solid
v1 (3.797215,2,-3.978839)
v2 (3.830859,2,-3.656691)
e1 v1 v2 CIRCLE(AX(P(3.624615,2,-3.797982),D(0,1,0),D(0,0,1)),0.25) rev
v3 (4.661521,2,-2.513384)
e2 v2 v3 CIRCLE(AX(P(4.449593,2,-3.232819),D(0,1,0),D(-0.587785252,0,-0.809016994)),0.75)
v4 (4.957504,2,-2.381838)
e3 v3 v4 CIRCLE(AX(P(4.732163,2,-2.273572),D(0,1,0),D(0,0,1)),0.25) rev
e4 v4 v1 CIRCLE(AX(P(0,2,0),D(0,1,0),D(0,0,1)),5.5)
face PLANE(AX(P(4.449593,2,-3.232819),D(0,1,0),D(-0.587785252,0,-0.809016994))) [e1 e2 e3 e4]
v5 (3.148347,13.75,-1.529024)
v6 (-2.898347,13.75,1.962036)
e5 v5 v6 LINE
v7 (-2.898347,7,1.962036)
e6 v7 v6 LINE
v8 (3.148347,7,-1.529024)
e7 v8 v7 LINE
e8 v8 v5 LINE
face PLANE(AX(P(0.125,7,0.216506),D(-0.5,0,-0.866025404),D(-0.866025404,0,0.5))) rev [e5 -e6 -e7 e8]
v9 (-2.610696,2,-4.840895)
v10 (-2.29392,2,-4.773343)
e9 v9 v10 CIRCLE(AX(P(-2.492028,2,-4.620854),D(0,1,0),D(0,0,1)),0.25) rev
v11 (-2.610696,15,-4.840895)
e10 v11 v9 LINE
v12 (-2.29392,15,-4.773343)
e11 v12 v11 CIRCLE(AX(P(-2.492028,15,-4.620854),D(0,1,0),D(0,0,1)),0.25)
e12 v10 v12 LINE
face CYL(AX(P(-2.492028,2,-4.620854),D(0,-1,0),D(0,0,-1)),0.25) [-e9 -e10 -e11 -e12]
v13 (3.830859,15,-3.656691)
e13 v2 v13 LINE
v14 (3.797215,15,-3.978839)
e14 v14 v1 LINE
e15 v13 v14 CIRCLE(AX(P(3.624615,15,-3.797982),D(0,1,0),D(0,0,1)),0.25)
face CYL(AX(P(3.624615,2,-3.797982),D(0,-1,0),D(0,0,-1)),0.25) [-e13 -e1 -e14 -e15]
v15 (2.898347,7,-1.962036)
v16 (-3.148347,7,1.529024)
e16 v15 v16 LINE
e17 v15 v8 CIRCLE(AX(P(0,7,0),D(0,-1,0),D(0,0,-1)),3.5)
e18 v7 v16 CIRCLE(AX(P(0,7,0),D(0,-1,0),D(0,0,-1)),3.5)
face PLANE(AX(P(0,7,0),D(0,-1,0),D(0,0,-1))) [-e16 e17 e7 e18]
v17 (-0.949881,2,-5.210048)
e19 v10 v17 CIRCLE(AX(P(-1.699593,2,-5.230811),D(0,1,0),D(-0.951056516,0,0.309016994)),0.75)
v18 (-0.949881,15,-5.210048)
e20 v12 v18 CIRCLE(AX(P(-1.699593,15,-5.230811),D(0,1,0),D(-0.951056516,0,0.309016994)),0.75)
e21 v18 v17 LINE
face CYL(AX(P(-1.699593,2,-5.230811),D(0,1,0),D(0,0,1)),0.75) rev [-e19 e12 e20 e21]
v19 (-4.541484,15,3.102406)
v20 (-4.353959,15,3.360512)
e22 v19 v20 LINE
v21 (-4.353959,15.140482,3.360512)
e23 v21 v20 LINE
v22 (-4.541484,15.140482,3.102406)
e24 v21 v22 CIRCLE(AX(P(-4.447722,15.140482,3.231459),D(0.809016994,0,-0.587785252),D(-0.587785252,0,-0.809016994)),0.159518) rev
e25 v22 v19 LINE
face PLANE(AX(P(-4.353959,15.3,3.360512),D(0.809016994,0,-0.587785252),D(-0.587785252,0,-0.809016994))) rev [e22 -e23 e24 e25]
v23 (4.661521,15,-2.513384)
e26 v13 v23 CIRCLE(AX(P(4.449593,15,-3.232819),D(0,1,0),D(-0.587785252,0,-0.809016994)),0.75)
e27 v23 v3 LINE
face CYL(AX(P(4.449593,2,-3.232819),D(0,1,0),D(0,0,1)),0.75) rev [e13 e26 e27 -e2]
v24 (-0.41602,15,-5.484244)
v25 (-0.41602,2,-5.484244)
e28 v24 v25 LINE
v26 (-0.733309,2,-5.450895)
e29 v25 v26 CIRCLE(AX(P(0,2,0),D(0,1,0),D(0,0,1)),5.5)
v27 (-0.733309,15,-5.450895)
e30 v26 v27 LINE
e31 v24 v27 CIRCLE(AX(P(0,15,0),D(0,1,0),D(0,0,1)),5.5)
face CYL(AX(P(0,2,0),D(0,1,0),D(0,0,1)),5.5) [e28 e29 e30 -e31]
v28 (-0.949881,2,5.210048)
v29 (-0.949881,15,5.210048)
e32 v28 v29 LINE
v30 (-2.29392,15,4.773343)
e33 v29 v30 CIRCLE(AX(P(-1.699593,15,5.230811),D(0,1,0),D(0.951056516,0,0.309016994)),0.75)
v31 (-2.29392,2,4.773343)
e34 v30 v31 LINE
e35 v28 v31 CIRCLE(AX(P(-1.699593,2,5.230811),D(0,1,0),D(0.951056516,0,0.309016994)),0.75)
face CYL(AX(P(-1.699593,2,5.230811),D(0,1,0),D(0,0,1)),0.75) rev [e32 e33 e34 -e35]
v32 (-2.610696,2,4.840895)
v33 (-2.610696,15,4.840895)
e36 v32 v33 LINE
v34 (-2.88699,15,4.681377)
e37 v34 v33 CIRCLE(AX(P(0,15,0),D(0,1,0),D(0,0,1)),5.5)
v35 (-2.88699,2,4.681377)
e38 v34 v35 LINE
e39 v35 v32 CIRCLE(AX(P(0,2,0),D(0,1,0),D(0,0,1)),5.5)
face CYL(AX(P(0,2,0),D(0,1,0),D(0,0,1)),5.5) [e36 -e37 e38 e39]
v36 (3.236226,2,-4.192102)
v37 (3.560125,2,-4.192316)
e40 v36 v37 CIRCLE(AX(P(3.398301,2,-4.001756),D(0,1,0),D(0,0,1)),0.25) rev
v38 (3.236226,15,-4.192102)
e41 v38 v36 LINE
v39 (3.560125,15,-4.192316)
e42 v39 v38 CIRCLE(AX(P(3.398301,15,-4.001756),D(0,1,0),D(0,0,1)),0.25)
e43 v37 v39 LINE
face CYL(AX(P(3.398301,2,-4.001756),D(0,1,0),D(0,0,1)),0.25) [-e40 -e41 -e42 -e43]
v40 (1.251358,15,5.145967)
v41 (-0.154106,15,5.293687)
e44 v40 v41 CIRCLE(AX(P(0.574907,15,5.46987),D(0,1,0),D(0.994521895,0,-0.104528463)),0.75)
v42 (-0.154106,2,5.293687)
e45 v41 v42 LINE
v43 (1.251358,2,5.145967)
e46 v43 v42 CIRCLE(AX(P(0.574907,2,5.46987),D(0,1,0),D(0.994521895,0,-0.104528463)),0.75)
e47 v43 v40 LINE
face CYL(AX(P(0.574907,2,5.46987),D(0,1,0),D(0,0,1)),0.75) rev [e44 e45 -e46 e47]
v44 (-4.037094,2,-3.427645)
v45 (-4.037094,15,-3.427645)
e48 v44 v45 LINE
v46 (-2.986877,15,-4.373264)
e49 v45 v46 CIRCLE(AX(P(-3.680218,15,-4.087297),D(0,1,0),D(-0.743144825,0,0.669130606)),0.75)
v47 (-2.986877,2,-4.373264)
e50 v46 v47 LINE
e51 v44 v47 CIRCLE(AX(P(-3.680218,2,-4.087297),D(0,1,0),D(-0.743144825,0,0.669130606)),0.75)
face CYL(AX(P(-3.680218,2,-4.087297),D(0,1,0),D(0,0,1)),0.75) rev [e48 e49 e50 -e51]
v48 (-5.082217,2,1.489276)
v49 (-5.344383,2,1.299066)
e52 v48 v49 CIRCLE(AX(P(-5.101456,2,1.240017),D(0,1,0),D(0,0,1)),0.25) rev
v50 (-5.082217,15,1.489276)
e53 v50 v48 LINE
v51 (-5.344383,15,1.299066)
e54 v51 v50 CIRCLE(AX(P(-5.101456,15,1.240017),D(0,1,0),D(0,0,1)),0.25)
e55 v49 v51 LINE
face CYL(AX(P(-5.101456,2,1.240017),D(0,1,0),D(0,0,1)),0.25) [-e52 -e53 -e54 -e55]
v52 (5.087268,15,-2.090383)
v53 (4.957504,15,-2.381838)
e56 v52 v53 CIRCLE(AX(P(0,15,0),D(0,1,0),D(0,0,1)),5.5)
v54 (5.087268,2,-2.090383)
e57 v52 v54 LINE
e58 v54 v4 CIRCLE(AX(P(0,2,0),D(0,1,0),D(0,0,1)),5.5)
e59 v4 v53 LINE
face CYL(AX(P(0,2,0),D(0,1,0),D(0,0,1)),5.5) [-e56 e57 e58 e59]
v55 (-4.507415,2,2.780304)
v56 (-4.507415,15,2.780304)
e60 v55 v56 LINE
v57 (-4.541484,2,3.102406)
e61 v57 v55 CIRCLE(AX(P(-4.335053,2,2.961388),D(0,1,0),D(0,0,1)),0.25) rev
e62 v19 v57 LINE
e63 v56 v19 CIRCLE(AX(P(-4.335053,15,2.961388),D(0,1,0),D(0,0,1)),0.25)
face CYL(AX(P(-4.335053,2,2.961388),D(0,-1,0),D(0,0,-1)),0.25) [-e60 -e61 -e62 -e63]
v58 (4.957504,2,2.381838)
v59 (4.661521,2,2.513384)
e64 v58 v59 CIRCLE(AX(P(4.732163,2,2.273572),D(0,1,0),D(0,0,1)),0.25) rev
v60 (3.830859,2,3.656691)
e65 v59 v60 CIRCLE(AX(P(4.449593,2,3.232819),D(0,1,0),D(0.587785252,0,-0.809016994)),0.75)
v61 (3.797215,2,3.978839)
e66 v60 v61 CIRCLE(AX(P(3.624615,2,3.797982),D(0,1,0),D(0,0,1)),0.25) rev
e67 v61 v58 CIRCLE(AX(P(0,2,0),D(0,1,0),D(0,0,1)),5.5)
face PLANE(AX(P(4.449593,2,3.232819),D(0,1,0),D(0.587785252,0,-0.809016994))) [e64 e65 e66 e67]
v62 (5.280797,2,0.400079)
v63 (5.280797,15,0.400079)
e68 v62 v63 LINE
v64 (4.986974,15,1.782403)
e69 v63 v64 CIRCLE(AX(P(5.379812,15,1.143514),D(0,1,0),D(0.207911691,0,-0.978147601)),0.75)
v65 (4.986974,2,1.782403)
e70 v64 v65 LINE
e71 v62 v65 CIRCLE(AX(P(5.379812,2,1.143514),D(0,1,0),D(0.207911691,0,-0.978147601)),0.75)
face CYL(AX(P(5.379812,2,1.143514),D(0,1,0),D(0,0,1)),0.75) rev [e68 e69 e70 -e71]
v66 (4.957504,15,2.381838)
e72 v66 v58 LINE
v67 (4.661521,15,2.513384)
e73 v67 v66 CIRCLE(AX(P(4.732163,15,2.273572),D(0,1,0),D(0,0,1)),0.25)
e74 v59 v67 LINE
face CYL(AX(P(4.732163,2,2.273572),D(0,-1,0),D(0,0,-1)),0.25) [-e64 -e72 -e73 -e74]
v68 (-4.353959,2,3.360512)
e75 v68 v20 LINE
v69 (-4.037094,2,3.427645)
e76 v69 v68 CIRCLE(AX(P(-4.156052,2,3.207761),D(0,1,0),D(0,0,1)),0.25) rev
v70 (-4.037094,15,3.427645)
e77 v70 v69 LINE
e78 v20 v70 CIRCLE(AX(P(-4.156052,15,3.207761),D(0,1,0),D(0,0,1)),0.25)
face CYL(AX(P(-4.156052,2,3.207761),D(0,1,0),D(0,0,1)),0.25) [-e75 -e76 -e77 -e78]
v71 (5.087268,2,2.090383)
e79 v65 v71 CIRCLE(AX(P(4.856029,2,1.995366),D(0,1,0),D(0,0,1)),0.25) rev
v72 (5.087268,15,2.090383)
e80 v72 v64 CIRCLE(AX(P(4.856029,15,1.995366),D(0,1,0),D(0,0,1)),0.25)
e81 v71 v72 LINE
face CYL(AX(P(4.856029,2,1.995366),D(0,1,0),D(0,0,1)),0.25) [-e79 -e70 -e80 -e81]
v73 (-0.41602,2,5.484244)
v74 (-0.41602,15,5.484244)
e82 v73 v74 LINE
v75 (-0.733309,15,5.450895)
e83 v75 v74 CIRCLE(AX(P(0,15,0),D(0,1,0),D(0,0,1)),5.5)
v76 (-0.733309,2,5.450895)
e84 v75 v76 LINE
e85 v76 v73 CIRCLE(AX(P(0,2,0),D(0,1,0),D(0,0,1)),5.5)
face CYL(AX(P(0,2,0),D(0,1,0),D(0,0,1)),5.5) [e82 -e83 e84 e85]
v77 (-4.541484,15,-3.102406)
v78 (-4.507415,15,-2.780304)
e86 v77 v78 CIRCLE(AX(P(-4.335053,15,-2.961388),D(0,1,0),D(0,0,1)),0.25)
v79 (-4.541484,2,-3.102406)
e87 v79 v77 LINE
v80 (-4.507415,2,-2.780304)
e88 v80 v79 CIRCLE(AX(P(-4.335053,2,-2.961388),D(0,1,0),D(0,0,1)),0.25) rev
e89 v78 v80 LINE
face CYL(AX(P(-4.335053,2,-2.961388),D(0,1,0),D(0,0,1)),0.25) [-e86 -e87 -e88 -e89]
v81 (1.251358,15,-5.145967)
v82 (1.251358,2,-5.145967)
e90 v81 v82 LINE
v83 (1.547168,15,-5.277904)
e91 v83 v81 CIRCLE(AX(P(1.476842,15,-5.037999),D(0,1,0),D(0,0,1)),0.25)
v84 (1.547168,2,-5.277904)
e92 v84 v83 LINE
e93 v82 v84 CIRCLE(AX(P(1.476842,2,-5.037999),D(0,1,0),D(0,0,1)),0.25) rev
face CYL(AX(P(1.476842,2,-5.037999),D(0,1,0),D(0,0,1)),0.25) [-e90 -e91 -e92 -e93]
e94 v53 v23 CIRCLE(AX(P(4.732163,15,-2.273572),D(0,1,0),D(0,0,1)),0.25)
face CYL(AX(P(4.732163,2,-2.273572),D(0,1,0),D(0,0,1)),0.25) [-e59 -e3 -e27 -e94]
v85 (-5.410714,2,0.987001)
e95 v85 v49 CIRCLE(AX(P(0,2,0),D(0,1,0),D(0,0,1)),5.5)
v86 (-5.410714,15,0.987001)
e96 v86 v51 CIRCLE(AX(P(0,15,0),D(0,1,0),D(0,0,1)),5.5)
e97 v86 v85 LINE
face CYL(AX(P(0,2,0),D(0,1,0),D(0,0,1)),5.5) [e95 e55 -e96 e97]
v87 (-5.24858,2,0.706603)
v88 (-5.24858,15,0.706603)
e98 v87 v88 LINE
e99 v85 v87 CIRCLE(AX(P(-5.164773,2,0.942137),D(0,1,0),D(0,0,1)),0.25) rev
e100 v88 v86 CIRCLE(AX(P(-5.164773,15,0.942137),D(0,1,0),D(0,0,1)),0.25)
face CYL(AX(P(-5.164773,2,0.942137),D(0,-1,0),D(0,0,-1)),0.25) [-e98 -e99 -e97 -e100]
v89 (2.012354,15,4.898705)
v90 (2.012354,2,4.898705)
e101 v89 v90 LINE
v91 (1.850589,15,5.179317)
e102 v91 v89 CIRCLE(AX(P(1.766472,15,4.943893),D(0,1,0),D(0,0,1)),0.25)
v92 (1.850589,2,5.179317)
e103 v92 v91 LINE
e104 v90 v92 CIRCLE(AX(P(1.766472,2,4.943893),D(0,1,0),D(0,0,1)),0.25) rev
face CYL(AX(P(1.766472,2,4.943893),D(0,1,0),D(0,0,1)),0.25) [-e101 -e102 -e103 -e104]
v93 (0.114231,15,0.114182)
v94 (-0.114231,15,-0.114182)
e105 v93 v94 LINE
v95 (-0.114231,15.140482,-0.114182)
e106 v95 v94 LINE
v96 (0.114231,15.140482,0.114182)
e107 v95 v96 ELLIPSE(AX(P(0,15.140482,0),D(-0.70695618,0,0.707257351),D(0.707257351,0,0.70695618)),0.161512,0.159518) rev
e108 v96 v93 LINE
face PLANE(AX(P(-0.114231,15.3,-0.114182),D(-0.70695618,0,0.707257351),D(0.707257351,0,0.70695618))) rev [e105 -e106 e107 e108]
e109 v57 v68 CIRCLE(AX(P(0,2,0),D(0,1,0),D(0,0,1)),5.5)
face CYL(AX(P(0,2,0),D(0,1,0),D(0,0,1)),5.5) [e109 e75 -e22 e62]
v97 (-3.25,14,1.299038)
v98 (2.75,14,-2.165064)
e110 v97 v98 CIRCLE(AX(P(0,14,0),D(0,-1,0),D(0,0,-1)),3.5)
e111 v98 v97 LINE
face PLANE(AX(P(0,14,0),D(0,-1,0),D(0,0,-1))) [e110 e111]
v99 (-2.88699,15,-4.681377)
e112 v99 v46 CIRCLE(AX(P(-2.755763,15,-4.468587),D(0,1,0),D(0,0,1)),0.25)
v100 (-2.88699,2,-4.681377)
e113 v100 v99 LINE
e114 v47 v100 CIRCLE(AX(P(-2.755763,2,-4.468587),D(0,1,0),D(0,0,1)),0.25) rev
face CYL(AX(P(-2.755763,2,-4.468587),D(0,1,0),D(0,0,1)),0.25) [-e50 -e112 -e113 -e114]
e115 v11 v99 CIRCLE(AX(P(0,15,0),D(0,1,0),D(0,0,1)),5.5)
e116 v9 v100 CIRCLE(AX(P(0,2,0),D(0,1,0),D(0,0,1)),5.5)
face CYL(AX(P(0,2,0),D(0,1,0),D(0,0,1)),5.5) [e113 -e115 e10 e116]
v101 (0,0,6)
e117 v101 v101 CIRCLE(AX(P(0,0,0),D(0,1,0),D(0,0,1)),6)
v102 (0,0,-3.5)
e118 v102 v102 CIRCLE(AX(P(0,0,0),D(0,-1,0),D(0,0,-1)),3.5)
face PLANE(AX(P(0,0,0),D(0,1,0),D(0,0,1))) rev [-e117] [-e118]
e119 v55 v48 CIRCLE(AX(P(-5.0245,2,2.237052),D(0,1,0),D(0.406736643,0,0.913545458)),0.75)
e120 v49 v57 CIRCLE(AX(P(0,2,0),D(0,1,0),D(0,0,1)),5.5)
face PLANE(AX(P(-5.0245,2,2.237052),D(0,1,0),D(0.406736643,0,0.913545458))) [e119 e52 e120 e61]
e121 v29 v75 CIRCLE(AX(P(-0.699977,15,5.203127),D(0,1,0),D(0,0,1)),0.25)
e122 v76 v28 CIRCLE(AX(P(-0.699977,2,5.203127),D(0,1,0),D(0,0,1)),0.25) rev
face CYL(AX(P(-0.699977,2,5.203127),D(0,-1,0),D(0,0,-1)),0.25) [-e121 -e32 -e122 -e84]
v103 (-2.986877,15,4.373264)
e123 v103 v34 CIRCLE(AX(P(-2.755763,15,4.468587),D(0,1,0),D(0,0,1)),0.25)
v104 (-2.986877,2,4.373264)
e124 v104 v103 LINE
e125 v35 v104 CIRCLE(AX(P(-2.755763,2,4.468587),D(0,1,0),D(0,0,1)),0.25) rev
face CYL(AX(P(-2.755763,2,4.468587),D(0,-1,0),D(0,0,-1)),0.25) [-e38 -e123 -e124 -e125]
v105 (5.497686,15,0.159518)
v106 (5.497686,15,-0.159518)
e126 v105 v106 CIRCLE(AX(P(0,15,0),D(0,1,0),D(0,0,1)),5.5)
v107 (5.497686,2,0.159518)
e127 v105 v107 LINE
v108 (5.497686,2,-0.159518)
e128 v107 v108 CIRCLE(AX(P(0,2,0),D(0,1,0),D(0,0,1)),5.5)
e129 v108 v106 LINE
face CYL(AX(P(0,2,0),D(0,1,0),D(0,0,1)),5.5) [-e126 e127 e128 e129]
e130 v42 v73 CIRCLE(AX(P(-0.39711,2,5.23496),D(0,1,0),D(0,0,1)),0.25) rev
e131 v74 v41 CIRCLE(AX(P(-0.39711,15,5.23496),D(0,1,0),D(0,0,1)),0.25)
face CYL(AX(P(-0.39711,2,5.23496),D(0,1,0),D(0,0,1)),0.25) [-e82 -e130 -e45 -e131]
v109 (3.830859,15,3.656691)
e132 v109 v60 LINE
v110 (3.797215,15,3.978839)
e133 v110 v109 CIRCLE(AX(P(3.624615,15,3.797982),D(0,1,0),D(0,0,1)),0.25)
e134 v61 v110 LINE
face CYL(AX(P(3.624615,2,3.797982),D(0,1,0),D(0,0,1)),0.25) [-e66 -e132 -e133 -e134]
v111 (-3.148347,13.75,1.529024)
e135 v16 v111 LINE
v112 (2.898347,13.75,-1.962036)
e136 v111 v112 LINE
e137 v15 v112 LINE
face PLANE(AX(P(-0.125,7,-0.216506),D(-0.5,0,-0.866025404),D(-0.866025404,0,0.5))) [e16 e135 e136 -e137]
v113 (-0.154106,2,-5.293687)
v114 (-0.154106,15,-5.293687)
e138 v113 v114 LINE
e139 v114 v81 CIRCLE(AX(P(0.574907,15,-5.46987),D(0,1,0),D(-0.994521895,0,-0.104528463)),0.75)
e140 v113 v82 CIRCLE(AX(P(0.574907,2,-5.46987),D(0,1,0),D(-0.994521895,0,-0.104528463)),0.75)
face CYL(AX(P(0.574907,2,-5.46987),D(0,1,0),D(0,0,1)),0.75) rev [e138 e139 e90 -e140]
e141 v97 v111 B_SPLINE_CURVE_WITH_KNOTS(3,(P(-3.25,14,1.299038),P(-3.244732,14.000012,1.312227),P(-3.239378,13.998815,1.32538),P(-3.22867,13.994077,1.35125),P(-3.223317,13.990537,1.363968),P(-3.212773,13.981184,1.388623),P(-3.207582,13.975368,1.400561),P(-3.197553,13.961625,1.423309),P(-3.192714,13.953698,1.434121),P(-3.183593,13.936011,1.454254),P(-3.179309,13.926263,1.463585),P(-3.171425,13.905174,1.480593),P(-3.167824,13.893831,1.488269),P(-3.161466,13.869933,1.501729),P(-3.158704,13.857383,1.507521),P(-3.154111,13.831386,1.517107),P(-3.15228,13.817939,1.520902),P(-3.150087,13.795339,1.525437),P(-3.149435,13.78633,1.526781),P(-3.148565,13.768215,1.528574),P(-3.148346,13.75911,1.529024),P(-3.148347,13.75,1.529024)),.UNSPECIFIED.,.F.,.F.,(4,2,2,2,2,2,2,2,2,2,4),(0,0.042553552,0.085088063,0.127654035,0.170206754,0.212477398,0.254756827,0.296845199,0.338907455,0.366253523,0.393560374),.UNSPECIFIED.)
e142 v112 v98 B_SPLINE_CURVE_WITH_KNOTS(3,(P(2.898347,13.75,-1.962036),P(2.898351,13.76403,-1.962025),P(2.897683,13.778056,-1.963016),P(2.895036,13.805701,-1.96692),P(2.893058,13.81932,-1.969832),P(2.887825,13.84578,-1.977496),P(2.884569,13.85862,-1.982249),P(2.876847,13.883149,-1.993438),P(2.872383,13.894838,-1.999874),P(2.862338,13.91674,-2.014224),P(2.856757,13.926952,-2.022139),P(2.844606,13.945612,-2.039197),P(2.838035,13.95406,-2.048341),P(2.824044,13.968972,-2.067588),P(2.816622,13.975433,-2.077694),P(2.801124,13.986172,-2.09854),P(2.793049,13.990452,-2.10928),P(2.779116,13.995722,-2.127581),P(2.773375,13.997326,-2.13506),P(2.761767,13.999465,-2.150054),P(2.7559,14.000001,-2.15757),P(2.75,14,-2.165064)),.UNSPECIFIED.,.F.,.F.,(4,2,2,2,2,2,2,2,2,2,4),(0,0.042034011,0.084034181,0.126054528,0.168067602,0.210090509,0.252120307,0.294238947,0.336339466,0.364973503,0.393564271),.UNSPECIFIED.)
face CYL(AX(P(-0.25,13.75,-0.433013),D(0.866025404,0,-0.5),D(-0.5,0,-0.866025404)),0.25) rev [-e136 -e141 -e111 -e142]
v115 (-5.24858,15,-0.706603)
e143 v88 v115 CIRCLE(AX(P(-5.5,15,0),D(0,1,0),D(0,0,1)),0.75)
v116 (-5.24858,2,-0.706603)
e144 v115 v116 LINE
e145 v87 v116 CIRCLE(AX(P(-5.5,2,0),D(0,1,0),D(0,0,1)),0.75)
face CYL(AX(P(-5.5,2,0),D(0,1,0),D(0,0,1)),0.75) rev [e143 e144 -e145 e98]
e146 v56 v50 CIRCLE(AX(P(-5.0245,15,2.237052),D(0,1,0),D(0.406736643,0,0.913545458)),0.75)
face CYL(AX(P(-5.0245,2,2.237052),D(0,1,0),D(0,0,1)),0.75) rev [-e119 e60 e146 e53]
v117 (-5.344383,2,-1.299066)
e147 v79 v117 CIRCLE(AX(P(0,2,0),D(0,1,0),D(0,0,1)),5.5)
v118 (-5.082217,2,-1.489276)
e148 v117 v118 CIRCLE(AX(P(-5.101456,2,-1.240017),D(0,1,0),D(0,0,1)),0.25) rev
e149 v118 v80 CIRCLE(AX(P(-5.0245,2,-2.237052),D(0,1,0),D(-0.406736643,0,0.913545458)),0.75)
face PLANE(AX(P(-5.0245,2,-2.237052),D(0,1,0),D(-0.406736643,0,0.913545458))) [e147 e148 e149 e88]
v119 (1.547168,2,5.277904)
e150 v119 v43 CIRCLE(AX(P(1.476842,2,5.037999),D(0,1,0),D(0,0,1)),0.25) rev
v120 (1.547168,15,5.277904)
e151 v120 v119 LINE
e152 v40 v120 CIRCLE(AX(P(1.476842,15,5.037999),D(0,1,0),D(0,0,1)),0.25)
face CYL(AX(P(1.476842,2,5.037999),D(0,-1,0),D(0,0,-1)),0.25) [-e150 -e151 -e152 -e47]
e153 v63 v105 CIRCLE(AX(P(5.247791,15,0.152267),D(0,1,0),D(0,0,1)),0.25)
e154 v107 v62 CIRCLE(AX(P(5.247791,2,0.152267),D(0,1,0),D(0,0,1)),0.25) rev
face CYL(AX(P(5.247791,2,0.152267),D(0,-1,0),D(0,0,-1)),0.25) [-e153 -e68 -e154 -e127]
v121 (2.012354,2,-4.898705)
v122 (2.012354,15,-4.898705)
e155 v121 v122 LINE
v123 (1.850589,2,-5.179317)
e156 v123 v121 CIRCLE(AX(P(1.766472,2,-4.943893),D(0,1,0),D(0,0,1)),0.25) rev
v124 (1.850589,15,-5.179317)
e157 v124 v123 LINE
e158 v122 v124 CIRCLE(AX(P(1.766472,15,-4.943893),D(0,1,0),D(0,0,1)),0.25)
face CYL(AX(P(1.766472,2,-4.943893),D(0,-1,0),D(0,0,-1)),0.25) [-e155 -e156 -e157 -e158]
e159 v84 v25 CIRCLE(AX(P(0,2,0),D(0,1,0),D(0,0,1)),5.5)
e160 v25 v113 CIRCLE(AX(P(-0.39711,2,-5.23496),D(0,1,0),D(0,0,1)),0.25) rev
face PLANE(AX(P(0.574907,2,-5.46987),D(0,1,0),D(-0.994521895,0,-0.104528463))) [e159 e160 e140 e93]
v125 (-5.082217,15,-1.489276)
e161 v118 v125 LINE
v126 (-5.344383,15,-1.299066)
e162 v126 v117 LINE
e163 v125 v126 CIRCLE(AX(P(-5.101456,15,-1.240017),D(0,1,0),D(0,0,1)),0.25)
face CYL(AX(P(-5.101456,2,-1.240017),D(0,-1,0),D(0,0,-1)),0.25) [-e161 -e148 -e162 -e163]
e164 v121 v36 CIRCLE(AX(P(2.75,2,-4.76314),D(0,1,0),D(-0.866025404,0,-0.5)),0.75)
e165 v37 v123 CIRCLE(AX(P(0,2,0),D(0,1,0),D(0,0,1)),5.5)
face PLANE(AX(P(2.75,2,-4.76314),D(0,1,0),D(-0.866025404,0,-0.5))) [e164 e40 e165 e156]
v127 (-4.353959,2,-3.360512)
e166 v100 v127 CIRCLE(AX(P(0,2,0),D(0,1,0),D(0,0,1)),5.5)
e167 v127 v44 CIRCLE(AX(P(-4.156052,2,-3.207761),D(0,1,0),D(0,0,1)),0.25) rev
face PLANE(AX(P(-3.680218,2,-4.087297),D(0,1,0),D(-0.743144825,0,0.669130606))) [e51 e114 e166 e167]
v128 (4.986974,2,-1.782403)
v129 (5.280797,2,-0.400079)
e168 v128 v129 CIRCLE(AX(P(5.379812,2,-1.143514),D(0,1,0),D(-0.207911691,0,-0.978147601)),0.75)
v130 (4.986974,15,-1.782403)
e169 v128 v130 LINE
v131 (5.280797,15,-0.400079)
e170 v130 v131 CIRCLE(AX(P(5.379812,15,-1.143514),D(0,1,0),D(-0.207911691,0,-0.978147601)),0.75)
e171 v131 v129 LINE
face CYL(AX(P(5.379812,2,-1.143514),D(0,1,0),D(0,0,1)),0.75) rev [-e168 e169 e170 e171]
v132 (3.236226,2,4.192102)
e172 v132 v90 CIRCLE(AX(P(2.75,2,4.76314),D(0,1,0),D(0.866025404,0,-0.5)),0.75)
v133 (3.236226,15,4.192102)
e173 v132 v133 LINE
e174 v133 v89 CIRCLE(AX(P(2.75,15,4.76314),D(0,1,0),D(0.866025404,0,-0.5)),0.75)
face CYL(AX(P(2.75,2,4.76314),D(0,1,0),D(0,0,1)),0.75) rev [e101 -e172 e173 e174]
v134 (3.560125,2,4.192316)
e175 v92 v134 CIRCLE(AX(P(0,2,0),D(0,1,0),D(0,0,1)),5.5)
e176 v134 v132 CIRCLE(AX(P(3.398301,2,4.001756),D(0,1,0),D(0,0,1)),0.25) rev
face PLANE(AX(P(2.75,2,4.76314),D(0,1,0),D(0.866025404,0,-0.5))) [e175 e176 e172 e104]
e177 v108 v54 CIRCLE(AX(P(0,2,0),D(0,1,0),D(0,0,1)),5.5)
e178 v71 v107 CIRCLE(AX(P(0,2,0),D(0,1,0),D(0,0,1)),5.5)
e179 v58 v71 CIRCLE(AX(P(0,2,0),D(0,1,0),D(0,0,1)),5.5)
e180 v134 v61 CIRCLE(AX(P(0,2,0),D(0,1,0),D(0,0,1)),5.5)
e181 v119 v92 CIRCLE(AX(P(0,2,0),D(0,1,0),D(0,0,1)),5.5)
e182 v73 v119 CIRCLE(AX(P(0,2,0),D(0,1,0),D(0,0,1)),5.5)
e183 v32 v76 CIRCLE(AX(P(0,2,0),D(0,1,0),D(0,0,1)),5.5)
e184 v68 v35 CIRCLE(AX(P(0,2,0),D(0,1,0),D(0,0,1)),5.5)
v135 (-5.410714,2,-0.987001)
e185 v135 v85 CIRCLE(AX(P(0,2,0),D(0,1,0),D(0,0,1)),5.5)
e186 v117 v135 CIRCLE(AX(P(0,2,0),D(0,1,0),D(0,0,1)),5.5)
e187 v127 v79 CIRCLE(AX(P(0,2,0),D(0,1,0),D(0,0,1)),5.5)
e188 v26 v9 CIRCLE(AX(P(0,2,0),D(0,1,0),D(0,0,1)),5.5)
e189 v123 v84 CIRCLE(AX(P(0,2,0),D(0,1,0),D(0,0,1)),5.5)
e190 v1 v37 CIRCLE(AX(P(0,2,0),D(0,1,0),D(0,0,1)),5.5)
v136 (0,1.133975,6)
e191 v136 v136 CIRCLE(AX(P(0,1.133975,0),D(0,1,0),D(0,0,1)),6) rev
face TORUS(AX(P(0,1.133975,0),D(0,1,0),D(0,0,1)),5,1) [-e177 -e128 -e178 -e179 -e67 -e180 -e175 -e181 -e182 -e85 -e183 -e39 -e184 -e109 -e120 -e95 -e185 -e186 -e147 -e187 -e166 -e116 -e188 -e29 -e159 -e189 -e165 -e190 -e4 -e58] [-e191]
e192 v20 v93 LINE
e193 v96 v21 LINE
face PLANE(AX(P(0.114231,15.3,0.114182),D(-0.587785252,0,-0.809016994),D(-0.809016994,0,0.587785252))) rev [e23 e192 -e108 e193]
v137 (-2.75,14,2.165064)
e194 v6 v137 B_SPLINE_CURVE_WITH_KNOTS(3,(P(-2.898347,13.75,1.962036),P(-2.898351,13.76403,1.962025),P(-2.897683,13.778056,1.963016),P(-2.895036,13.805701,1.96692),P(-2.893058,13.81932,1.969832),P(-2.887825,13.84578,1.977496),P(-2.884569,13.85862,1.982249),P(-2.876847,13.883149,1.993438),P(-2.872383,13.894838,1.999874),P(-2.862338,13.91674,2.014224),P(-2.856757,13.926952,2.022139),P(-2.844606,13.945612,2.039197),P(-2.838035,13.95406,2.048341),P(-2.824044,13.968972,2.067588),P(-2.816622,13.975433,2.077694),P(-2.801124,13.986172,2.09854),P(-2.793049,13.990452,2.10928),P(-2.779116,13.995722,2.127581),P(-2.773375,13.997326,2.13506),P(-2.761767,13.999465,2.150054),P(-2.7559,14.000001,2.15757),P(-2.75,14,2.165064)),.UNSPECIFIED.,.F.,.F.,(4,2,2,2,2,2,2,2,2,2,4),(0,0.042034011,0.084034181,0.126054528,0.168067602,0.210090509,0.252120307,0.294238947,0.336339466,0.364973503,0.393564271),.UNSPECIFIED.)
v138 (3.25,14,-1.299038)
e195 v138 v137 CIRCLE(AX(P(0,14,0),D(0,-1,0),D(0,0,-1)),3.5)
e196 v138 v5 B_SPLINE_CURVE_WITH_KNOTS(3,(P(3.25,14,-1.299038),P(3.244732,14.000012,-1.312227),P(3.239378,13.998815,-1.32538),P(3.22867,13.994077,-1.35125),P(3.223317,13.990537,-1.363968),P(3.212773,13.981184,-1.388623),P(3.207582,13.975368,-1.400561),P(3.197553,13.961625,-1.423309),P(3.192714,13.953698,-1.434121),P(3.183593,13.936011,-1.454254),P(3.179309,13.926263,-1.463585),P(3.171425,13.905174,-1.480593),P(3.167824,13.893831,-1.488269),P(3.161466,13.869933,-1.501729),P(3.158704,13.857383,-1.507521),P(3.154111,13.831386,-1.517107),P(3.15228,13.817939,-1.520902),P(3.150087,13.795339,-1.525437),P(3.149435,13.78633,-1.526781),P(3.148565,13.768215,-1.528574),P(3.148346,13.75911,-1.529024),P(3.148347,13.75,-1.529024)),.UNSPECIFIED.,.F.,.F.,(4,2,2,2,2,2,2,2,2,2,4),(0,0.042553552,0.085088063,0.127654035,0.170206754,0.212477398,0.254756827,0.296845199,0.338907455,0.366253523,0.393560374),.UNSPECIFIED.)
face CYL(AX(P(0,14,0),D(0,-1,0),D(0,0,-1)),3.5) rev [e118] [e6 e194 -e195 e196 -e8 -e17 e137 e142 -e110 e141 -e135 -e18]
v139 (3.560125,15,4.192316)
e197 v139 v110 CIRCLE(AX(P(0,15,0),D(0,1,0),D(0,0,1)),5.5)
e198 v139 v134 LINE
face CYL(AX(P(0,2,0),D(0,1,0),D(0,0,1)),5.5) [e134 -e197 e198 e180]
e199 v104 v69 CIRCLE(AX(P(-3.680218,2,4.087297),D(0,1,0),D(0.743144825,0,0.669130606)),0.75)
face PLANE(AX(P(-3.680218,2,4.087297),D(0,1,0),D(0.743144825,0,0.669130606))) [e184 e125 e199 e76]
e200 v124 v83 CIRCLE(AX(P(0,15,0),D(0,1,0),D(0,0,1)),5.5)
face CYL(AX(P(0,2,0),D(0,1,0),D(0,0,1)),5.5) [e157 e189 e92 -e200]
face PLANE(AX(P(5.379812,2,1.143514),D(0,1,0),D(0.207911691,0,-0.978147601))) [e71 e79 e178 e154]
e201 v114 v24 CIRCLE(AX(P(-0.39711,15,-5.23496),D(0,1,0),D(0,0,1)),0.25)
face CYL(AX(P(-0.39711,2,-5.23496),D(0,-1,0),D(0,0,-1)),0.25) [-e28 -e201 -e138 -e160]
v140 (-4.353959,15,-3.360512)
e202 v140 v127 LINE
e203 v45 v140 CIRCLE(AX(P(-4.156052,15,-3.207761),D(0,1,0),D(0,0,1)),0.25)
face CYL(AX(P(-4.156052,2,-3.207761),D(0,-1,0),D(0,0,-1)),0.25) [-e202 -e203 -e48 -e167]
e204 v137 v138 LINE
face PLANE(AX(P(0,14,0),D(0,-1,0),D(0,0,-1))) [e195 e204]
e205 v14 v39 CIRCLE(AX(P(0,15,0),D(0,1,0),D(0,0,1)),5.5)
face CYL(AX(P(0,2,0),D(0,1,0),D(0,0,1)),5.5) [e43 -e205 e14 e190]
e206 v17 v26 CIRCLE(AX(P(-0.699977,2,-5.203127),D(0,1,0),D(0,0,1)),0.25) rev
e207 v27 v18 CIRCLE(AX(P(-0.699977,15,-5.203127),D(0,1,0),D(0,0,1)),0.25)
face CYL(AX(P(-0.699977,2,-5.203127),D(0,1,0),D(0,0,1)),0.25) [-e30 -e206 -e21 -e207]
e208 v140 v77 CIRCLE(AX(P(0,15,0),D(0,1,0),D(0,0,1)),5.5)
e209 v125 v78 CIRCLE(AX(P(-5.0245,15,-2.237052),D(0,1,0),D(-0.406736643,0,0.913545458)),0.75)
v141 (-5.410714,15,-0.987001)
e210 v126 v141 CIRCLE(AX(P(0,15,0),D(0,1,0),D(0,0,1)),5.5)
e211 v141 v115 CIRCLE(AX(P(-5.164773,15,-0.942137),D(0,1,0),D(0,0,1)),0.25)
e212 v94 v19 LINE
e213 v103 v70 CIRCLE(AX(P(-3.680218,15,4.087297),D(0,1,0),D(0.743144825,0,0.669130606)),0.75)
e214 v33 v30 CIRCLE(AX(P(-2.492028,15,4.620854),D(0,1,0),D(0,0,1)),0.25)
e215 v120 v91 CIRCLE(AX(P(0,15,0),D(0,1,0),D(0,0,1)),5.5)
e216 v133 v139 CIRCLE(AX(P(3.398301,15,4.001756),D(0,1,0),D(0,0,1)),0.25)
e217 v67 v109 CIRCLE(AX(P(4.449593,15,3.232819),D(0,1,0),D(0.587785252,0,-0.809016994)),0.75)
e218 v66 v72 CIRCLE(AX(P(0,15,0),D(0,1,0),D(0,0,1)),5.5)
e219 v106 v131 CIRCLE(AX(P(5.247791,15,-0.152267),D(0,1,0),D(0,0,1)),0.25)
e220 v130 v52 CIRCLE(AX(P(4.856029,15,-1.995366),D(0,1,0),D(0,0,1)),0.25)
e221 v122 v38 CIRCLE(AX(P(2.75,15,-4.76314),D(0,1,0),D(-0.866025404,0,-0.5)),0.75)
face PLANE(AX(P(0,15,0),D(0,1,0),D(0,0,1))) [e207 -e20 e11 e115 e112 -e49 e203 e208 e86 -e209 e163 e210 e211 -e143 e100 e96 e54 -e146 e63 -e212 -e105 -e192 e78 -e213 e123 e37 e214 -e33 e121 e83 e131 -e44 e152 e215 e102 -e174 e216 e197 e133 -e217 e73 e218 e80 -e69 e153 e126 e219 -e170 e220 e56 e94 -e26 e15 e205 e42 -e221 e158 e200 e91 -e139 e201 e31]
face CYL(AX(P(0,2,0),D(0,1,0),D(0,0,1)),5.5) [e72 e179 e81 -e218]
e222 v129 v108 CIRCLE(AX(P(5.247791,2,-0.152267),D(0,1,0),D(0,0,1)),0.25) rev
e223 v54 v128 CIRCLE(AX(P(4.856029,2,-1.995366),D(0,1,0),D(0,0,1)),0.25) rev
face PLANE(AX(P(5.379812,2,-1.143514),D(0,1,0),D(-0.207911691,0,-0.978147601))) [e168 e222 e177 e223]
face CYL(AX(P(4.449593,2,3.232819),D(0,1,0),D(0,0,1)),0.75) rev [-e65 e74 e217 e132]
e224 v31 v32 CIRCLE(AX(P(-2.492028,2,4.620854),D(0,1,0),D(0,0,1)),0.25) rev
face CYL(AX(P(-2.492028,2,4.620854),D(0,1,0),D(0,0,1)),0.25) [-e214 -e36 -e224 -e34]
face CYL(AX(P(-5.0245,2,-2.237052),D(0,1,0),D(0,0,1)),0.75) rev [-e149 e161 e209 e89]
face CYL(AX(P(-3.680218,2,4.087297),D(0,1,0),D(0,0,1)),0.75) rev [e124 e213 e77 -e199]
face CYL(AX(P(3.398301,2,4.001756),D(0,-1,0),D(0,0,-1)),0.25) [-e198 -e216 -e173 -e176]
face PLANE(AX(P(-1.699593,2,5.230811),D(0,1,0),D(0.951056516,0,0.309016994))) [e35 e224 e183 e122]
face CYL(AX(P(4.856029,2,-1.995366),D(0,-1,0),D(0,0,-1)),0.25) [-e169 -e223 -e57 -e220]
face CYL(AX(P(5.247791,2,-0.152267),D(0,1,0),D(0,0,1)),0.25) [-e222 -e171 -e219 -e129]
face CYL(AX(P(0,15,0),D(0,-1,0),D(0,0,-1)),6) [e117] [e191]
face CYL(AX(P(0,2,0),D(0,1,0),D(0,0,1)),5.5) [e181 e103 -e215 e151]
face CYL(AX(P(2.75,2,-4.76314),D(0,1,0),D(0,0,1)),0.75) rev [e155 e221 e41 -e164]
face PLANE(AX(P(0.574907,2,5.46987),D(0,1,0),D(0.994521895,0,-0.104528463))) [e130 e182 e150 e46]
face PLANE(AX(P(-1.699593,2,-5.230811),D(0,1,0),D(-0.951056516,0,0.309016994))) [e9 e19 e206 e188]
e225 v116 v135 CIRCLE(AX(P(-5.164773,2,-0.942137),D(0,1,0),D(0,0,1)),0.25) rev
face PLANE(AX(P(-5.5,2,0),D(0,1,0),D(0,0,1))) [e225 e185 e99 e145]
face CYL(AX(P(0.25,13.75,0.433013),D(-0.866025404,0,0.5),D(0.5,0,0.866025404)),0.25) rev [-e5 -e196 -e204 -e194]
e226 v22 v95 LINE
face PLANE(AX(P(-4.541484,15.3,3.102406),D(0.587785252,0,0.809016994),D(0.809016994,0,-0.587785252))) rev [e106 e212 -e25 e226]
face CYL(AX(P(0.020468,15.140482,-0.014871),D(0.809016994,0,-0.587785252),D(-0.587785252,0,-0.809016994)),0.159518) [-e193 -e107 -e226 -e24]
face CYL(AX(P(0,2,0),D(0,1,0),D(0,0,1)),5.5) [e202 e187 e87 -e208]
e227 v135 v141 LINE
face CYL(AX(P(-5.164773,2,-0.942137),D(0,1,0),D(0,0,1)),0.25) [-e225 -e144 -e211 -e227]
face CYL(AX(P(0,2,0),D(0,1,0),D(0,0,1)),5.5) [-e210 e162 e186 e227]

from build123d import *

# Parameters (mm, degrees)
SKETCH1_R                = 6
BOSS_EXTRUDE1_DEPTH      = 15
CUT_EXTRUDE1_START       = -13
SKETCH2_R                = 6
SKETCH2_R_2              = 5.5
CUT_EXTRUDE1_DEPTH       = 13
FILLET1_R                = 1
SKETCH3_R                = 0.75
CUT_EXTRUDE2_DEPTH       = 13
FILLET2_R                = 0.25
CIRPATTERN1_COUNT        = 15
FILLET2_OF_CIRPATTERN1_R = 0.25
SKETCH4_R                = 3.5
CUT_EXTRUDE3_DEPTH       = 14
BOSS_EXTRUDE2_DEPTH      = 7
FILLET3_R                = 0.25
BOSS_EXTRUDE3_DEPTH      = 0.3
FILLET4_R                = 0.159518


# Some blends are built 0.0001 mm under size
with BuildPart() as part:
    # Sketch1 → Boss-Extrude1 (new body)
    with BuildSketch(Plane(origin=(0, 0, 0), x_dir=(1, 0, 0), z_dir=(0, 1, 0))):
        with Locations(Location((0, 0, 0), (0, 0, 270))):
            Circle(SKETCH1_R)
    extrude(amount=BOSS_EXTRUDE1_DEPTH)

    # Sketch2 → Cut-Extrude1 (cut)
    with BuildSketch(Plane(origin=(0, 15, 0), x_dir=(1, 0, 0), z_dir=(0, 1, 0)).offset(CUT_EXTRUDE1_START)):
        with Locations(Location((0, 0, 0), (0, 0, 270))):
            Circle(SKETCH2_R)
        with Locations(Location((0, 0, 0), (0, 0, 270))):
            Circle(SKETCH2_R_2, mode=Mode.SUBTRACT)
    extrude(amount=CUT_EXTRUDE1_DEPTH, mode=Mode.SUBTRACT)

    # Fillet1
    # the kernel refuses this fillet: 1 mm, written as the material it takes off along each edge
    with BuildSketch(Plane(origin=(0, 2, 0), x_dir=(0, 0, 1), z_dir=(-1, 0, 0))) as fillet1_piece_1:
        with BuildLine():
            CenterArc((5, -0.866025404), FILLET1_R, 0, 60)
            Line((5.5, 0), (5.51, 0.017320508))
            ThreePointArc((5.51, 0.017320508), (5.75, 0.02), (6, 0.02))
            Line((6, 0.02), (6.02, 0))
            Line((6.02, 0), (6.02, -0.866025404))
            Line((6.02, -0.866025404), (6, -0.866025404))
        make_face()
    revolve(axis=Axis((0, 2, 0), (0, 1, 0)), mode=Mode.SUBTRACT)

    # Sketch3 → Cut-Extrude2 (cut)
    with BuildSketch(Plane(origin=(0, 15, 0), x_dir=(1, 0, 0), z_dir=(0, 1, 0))):
        with Locations((-5.5, 0)):
            Circle(SKETCH3_R)
    cut_extrude2 = extrude(amount=-CUT_EXTRUDE2_DEPTH, mode=Mode.SUBTRACT)

    # Fillet2
    fillet2_edges = [part.edges().sort_by_distance(p)[0] for p in [
        (-5.448863636, 8.5, 0.748254684),
        (-5.448863636, 8.5, -0.748254684),
    ]]
    fillet(fillet2_edges, radius=FILLET2_R)

    # CirPattern1: Cut-Extrude2 ×15 about axis
    cirpattern1_axis = Axis((0, 0, 0), (0, 1, 0))
    for i in range(1, CIRPATTERN1_COUNT):
        add(cut_extrude2.rotate(cirpattern1_axis, i * 360 / CIRPATTERN1_COUNT), mode=Mode.SUBTRACT)

    # Fillet2 of CirPattern1
    fillet2_of_cirpattern1_edges = [part.edges().sort_by_distance(p)[0] for p in [
        (-4.673442026, 8.5, 2.899817172),
        (-5.282127223, 8.5, 1.532687836),
        (-3.089939832, 8.5, 4.549974927),
        (-4.202063026, 8.5, 3.548614706),
        (-0.97215897, 8.5, 5.413400681),
        (-2.395423957, 8.5, 4.950953854),
        (1.313717009, 8.5, 5.340800279),
        (-0.174594324, 8.5, 5.497228104),
        (3.372439383, 8.5, 4.344726989),
        (2.076424253, 8.5, 5.092981673),
        (4.84803635, 8.5, 2.597410932),
        (3.968410214, 8.5, 3.808112443),
        (5.485363789, 8.5, 0.400978928),
        (5.174221996, 8.5, 1.864785976),
        (5.174221996, 8.5, -1.864785976),
        (5.485363789, 8.5, -0.400978928),
        (3.968410214, 8.5, -3.808112443),
        (4.84803635, 8.5, -2.597410932),
        (2.076424253, 8.5, -5.092981673),
        (3.372439383, 8.5, -4.344726989),
        (-0.174594324, 8.5, -5.497228104),
        (1.313717009, 8.5, -5.340800279),
        (-2.395423957, 8.5, -4.950953854),
        (-0.97215897, 8.5, -5.413400681),
        (-4.202063026, 8.5, -3.548614706),
        (-3.089939832, 8.5, -4.549974927),
        (-5.282127223, 8.5, -1.532687836),
        (-4.673442026, 8.5, -2.899817172),
    ]]
    fillet(fillet2_of_cirpattern1_edges, radius=FILLET2_OF_CIRPATTERN1_R)

    # Sketch4 → Cut-Extrude3 (cut)
    with BuildSketch(Plane.XZ):
        with Locations(Location((0, 0, 0), (0, 0, 270))):
            Circle(SKETCH4_R)
    extrude(amount=-CUT_EXTRUDE3_DEPTH, mode=Mode.SUBTRACT)

    # Sketch5 → Boss-Extrude2 (add)
    with BuildSketch(Plane.XZ.offset(-14)):
        Polygon((3.406463932, -1.678047733), (-3.746712586, 2.451840655), (-3.996712586, 2.018827953), (3.156463932, -2.111060435), align=None)
    extrude(amount=BOSS_EXTRUDE2_DEPTH)

    # Fillet3
    fillet3_edges = [part.edges().sort_by_distance(p)[0] for p in [
        (0.125, 14, 0.216506351),
        (-0.125, 14, -0.216506351),
    ]]
    fillet(fillet3_edges, radius=FILLET3_R)

    # Sketch6 → Boss-Extrude3 (add)
    with BuildSketch(Plane(origin=(0, 15, 0), x_dir=(1, 0, 0), z_dir=(0, 1, 0))):
        Polygon((-4.353959196, -3.360511765), (-4.541483996, -3.10240602), (-0.114230541, 0.114181898), (0, 0), (0.114230541, -0.114181898), align=None)
    extrude(amount=BOSS_EXTRUDE3_DEPTH)

    # Fillet4
    fillet4_edges = [part.edges().sort_by_distance(p)[0] for p in [
        (-2.119864328, 15.3, 1.737346831),
        (-2.327857269, 15.3, 1.494112061),
    ]]
    fillet(fillet4_edges, radius=FILLET4_R - 0.0001)  # a hair under: the kernel refuses the full size


solid = part.part
